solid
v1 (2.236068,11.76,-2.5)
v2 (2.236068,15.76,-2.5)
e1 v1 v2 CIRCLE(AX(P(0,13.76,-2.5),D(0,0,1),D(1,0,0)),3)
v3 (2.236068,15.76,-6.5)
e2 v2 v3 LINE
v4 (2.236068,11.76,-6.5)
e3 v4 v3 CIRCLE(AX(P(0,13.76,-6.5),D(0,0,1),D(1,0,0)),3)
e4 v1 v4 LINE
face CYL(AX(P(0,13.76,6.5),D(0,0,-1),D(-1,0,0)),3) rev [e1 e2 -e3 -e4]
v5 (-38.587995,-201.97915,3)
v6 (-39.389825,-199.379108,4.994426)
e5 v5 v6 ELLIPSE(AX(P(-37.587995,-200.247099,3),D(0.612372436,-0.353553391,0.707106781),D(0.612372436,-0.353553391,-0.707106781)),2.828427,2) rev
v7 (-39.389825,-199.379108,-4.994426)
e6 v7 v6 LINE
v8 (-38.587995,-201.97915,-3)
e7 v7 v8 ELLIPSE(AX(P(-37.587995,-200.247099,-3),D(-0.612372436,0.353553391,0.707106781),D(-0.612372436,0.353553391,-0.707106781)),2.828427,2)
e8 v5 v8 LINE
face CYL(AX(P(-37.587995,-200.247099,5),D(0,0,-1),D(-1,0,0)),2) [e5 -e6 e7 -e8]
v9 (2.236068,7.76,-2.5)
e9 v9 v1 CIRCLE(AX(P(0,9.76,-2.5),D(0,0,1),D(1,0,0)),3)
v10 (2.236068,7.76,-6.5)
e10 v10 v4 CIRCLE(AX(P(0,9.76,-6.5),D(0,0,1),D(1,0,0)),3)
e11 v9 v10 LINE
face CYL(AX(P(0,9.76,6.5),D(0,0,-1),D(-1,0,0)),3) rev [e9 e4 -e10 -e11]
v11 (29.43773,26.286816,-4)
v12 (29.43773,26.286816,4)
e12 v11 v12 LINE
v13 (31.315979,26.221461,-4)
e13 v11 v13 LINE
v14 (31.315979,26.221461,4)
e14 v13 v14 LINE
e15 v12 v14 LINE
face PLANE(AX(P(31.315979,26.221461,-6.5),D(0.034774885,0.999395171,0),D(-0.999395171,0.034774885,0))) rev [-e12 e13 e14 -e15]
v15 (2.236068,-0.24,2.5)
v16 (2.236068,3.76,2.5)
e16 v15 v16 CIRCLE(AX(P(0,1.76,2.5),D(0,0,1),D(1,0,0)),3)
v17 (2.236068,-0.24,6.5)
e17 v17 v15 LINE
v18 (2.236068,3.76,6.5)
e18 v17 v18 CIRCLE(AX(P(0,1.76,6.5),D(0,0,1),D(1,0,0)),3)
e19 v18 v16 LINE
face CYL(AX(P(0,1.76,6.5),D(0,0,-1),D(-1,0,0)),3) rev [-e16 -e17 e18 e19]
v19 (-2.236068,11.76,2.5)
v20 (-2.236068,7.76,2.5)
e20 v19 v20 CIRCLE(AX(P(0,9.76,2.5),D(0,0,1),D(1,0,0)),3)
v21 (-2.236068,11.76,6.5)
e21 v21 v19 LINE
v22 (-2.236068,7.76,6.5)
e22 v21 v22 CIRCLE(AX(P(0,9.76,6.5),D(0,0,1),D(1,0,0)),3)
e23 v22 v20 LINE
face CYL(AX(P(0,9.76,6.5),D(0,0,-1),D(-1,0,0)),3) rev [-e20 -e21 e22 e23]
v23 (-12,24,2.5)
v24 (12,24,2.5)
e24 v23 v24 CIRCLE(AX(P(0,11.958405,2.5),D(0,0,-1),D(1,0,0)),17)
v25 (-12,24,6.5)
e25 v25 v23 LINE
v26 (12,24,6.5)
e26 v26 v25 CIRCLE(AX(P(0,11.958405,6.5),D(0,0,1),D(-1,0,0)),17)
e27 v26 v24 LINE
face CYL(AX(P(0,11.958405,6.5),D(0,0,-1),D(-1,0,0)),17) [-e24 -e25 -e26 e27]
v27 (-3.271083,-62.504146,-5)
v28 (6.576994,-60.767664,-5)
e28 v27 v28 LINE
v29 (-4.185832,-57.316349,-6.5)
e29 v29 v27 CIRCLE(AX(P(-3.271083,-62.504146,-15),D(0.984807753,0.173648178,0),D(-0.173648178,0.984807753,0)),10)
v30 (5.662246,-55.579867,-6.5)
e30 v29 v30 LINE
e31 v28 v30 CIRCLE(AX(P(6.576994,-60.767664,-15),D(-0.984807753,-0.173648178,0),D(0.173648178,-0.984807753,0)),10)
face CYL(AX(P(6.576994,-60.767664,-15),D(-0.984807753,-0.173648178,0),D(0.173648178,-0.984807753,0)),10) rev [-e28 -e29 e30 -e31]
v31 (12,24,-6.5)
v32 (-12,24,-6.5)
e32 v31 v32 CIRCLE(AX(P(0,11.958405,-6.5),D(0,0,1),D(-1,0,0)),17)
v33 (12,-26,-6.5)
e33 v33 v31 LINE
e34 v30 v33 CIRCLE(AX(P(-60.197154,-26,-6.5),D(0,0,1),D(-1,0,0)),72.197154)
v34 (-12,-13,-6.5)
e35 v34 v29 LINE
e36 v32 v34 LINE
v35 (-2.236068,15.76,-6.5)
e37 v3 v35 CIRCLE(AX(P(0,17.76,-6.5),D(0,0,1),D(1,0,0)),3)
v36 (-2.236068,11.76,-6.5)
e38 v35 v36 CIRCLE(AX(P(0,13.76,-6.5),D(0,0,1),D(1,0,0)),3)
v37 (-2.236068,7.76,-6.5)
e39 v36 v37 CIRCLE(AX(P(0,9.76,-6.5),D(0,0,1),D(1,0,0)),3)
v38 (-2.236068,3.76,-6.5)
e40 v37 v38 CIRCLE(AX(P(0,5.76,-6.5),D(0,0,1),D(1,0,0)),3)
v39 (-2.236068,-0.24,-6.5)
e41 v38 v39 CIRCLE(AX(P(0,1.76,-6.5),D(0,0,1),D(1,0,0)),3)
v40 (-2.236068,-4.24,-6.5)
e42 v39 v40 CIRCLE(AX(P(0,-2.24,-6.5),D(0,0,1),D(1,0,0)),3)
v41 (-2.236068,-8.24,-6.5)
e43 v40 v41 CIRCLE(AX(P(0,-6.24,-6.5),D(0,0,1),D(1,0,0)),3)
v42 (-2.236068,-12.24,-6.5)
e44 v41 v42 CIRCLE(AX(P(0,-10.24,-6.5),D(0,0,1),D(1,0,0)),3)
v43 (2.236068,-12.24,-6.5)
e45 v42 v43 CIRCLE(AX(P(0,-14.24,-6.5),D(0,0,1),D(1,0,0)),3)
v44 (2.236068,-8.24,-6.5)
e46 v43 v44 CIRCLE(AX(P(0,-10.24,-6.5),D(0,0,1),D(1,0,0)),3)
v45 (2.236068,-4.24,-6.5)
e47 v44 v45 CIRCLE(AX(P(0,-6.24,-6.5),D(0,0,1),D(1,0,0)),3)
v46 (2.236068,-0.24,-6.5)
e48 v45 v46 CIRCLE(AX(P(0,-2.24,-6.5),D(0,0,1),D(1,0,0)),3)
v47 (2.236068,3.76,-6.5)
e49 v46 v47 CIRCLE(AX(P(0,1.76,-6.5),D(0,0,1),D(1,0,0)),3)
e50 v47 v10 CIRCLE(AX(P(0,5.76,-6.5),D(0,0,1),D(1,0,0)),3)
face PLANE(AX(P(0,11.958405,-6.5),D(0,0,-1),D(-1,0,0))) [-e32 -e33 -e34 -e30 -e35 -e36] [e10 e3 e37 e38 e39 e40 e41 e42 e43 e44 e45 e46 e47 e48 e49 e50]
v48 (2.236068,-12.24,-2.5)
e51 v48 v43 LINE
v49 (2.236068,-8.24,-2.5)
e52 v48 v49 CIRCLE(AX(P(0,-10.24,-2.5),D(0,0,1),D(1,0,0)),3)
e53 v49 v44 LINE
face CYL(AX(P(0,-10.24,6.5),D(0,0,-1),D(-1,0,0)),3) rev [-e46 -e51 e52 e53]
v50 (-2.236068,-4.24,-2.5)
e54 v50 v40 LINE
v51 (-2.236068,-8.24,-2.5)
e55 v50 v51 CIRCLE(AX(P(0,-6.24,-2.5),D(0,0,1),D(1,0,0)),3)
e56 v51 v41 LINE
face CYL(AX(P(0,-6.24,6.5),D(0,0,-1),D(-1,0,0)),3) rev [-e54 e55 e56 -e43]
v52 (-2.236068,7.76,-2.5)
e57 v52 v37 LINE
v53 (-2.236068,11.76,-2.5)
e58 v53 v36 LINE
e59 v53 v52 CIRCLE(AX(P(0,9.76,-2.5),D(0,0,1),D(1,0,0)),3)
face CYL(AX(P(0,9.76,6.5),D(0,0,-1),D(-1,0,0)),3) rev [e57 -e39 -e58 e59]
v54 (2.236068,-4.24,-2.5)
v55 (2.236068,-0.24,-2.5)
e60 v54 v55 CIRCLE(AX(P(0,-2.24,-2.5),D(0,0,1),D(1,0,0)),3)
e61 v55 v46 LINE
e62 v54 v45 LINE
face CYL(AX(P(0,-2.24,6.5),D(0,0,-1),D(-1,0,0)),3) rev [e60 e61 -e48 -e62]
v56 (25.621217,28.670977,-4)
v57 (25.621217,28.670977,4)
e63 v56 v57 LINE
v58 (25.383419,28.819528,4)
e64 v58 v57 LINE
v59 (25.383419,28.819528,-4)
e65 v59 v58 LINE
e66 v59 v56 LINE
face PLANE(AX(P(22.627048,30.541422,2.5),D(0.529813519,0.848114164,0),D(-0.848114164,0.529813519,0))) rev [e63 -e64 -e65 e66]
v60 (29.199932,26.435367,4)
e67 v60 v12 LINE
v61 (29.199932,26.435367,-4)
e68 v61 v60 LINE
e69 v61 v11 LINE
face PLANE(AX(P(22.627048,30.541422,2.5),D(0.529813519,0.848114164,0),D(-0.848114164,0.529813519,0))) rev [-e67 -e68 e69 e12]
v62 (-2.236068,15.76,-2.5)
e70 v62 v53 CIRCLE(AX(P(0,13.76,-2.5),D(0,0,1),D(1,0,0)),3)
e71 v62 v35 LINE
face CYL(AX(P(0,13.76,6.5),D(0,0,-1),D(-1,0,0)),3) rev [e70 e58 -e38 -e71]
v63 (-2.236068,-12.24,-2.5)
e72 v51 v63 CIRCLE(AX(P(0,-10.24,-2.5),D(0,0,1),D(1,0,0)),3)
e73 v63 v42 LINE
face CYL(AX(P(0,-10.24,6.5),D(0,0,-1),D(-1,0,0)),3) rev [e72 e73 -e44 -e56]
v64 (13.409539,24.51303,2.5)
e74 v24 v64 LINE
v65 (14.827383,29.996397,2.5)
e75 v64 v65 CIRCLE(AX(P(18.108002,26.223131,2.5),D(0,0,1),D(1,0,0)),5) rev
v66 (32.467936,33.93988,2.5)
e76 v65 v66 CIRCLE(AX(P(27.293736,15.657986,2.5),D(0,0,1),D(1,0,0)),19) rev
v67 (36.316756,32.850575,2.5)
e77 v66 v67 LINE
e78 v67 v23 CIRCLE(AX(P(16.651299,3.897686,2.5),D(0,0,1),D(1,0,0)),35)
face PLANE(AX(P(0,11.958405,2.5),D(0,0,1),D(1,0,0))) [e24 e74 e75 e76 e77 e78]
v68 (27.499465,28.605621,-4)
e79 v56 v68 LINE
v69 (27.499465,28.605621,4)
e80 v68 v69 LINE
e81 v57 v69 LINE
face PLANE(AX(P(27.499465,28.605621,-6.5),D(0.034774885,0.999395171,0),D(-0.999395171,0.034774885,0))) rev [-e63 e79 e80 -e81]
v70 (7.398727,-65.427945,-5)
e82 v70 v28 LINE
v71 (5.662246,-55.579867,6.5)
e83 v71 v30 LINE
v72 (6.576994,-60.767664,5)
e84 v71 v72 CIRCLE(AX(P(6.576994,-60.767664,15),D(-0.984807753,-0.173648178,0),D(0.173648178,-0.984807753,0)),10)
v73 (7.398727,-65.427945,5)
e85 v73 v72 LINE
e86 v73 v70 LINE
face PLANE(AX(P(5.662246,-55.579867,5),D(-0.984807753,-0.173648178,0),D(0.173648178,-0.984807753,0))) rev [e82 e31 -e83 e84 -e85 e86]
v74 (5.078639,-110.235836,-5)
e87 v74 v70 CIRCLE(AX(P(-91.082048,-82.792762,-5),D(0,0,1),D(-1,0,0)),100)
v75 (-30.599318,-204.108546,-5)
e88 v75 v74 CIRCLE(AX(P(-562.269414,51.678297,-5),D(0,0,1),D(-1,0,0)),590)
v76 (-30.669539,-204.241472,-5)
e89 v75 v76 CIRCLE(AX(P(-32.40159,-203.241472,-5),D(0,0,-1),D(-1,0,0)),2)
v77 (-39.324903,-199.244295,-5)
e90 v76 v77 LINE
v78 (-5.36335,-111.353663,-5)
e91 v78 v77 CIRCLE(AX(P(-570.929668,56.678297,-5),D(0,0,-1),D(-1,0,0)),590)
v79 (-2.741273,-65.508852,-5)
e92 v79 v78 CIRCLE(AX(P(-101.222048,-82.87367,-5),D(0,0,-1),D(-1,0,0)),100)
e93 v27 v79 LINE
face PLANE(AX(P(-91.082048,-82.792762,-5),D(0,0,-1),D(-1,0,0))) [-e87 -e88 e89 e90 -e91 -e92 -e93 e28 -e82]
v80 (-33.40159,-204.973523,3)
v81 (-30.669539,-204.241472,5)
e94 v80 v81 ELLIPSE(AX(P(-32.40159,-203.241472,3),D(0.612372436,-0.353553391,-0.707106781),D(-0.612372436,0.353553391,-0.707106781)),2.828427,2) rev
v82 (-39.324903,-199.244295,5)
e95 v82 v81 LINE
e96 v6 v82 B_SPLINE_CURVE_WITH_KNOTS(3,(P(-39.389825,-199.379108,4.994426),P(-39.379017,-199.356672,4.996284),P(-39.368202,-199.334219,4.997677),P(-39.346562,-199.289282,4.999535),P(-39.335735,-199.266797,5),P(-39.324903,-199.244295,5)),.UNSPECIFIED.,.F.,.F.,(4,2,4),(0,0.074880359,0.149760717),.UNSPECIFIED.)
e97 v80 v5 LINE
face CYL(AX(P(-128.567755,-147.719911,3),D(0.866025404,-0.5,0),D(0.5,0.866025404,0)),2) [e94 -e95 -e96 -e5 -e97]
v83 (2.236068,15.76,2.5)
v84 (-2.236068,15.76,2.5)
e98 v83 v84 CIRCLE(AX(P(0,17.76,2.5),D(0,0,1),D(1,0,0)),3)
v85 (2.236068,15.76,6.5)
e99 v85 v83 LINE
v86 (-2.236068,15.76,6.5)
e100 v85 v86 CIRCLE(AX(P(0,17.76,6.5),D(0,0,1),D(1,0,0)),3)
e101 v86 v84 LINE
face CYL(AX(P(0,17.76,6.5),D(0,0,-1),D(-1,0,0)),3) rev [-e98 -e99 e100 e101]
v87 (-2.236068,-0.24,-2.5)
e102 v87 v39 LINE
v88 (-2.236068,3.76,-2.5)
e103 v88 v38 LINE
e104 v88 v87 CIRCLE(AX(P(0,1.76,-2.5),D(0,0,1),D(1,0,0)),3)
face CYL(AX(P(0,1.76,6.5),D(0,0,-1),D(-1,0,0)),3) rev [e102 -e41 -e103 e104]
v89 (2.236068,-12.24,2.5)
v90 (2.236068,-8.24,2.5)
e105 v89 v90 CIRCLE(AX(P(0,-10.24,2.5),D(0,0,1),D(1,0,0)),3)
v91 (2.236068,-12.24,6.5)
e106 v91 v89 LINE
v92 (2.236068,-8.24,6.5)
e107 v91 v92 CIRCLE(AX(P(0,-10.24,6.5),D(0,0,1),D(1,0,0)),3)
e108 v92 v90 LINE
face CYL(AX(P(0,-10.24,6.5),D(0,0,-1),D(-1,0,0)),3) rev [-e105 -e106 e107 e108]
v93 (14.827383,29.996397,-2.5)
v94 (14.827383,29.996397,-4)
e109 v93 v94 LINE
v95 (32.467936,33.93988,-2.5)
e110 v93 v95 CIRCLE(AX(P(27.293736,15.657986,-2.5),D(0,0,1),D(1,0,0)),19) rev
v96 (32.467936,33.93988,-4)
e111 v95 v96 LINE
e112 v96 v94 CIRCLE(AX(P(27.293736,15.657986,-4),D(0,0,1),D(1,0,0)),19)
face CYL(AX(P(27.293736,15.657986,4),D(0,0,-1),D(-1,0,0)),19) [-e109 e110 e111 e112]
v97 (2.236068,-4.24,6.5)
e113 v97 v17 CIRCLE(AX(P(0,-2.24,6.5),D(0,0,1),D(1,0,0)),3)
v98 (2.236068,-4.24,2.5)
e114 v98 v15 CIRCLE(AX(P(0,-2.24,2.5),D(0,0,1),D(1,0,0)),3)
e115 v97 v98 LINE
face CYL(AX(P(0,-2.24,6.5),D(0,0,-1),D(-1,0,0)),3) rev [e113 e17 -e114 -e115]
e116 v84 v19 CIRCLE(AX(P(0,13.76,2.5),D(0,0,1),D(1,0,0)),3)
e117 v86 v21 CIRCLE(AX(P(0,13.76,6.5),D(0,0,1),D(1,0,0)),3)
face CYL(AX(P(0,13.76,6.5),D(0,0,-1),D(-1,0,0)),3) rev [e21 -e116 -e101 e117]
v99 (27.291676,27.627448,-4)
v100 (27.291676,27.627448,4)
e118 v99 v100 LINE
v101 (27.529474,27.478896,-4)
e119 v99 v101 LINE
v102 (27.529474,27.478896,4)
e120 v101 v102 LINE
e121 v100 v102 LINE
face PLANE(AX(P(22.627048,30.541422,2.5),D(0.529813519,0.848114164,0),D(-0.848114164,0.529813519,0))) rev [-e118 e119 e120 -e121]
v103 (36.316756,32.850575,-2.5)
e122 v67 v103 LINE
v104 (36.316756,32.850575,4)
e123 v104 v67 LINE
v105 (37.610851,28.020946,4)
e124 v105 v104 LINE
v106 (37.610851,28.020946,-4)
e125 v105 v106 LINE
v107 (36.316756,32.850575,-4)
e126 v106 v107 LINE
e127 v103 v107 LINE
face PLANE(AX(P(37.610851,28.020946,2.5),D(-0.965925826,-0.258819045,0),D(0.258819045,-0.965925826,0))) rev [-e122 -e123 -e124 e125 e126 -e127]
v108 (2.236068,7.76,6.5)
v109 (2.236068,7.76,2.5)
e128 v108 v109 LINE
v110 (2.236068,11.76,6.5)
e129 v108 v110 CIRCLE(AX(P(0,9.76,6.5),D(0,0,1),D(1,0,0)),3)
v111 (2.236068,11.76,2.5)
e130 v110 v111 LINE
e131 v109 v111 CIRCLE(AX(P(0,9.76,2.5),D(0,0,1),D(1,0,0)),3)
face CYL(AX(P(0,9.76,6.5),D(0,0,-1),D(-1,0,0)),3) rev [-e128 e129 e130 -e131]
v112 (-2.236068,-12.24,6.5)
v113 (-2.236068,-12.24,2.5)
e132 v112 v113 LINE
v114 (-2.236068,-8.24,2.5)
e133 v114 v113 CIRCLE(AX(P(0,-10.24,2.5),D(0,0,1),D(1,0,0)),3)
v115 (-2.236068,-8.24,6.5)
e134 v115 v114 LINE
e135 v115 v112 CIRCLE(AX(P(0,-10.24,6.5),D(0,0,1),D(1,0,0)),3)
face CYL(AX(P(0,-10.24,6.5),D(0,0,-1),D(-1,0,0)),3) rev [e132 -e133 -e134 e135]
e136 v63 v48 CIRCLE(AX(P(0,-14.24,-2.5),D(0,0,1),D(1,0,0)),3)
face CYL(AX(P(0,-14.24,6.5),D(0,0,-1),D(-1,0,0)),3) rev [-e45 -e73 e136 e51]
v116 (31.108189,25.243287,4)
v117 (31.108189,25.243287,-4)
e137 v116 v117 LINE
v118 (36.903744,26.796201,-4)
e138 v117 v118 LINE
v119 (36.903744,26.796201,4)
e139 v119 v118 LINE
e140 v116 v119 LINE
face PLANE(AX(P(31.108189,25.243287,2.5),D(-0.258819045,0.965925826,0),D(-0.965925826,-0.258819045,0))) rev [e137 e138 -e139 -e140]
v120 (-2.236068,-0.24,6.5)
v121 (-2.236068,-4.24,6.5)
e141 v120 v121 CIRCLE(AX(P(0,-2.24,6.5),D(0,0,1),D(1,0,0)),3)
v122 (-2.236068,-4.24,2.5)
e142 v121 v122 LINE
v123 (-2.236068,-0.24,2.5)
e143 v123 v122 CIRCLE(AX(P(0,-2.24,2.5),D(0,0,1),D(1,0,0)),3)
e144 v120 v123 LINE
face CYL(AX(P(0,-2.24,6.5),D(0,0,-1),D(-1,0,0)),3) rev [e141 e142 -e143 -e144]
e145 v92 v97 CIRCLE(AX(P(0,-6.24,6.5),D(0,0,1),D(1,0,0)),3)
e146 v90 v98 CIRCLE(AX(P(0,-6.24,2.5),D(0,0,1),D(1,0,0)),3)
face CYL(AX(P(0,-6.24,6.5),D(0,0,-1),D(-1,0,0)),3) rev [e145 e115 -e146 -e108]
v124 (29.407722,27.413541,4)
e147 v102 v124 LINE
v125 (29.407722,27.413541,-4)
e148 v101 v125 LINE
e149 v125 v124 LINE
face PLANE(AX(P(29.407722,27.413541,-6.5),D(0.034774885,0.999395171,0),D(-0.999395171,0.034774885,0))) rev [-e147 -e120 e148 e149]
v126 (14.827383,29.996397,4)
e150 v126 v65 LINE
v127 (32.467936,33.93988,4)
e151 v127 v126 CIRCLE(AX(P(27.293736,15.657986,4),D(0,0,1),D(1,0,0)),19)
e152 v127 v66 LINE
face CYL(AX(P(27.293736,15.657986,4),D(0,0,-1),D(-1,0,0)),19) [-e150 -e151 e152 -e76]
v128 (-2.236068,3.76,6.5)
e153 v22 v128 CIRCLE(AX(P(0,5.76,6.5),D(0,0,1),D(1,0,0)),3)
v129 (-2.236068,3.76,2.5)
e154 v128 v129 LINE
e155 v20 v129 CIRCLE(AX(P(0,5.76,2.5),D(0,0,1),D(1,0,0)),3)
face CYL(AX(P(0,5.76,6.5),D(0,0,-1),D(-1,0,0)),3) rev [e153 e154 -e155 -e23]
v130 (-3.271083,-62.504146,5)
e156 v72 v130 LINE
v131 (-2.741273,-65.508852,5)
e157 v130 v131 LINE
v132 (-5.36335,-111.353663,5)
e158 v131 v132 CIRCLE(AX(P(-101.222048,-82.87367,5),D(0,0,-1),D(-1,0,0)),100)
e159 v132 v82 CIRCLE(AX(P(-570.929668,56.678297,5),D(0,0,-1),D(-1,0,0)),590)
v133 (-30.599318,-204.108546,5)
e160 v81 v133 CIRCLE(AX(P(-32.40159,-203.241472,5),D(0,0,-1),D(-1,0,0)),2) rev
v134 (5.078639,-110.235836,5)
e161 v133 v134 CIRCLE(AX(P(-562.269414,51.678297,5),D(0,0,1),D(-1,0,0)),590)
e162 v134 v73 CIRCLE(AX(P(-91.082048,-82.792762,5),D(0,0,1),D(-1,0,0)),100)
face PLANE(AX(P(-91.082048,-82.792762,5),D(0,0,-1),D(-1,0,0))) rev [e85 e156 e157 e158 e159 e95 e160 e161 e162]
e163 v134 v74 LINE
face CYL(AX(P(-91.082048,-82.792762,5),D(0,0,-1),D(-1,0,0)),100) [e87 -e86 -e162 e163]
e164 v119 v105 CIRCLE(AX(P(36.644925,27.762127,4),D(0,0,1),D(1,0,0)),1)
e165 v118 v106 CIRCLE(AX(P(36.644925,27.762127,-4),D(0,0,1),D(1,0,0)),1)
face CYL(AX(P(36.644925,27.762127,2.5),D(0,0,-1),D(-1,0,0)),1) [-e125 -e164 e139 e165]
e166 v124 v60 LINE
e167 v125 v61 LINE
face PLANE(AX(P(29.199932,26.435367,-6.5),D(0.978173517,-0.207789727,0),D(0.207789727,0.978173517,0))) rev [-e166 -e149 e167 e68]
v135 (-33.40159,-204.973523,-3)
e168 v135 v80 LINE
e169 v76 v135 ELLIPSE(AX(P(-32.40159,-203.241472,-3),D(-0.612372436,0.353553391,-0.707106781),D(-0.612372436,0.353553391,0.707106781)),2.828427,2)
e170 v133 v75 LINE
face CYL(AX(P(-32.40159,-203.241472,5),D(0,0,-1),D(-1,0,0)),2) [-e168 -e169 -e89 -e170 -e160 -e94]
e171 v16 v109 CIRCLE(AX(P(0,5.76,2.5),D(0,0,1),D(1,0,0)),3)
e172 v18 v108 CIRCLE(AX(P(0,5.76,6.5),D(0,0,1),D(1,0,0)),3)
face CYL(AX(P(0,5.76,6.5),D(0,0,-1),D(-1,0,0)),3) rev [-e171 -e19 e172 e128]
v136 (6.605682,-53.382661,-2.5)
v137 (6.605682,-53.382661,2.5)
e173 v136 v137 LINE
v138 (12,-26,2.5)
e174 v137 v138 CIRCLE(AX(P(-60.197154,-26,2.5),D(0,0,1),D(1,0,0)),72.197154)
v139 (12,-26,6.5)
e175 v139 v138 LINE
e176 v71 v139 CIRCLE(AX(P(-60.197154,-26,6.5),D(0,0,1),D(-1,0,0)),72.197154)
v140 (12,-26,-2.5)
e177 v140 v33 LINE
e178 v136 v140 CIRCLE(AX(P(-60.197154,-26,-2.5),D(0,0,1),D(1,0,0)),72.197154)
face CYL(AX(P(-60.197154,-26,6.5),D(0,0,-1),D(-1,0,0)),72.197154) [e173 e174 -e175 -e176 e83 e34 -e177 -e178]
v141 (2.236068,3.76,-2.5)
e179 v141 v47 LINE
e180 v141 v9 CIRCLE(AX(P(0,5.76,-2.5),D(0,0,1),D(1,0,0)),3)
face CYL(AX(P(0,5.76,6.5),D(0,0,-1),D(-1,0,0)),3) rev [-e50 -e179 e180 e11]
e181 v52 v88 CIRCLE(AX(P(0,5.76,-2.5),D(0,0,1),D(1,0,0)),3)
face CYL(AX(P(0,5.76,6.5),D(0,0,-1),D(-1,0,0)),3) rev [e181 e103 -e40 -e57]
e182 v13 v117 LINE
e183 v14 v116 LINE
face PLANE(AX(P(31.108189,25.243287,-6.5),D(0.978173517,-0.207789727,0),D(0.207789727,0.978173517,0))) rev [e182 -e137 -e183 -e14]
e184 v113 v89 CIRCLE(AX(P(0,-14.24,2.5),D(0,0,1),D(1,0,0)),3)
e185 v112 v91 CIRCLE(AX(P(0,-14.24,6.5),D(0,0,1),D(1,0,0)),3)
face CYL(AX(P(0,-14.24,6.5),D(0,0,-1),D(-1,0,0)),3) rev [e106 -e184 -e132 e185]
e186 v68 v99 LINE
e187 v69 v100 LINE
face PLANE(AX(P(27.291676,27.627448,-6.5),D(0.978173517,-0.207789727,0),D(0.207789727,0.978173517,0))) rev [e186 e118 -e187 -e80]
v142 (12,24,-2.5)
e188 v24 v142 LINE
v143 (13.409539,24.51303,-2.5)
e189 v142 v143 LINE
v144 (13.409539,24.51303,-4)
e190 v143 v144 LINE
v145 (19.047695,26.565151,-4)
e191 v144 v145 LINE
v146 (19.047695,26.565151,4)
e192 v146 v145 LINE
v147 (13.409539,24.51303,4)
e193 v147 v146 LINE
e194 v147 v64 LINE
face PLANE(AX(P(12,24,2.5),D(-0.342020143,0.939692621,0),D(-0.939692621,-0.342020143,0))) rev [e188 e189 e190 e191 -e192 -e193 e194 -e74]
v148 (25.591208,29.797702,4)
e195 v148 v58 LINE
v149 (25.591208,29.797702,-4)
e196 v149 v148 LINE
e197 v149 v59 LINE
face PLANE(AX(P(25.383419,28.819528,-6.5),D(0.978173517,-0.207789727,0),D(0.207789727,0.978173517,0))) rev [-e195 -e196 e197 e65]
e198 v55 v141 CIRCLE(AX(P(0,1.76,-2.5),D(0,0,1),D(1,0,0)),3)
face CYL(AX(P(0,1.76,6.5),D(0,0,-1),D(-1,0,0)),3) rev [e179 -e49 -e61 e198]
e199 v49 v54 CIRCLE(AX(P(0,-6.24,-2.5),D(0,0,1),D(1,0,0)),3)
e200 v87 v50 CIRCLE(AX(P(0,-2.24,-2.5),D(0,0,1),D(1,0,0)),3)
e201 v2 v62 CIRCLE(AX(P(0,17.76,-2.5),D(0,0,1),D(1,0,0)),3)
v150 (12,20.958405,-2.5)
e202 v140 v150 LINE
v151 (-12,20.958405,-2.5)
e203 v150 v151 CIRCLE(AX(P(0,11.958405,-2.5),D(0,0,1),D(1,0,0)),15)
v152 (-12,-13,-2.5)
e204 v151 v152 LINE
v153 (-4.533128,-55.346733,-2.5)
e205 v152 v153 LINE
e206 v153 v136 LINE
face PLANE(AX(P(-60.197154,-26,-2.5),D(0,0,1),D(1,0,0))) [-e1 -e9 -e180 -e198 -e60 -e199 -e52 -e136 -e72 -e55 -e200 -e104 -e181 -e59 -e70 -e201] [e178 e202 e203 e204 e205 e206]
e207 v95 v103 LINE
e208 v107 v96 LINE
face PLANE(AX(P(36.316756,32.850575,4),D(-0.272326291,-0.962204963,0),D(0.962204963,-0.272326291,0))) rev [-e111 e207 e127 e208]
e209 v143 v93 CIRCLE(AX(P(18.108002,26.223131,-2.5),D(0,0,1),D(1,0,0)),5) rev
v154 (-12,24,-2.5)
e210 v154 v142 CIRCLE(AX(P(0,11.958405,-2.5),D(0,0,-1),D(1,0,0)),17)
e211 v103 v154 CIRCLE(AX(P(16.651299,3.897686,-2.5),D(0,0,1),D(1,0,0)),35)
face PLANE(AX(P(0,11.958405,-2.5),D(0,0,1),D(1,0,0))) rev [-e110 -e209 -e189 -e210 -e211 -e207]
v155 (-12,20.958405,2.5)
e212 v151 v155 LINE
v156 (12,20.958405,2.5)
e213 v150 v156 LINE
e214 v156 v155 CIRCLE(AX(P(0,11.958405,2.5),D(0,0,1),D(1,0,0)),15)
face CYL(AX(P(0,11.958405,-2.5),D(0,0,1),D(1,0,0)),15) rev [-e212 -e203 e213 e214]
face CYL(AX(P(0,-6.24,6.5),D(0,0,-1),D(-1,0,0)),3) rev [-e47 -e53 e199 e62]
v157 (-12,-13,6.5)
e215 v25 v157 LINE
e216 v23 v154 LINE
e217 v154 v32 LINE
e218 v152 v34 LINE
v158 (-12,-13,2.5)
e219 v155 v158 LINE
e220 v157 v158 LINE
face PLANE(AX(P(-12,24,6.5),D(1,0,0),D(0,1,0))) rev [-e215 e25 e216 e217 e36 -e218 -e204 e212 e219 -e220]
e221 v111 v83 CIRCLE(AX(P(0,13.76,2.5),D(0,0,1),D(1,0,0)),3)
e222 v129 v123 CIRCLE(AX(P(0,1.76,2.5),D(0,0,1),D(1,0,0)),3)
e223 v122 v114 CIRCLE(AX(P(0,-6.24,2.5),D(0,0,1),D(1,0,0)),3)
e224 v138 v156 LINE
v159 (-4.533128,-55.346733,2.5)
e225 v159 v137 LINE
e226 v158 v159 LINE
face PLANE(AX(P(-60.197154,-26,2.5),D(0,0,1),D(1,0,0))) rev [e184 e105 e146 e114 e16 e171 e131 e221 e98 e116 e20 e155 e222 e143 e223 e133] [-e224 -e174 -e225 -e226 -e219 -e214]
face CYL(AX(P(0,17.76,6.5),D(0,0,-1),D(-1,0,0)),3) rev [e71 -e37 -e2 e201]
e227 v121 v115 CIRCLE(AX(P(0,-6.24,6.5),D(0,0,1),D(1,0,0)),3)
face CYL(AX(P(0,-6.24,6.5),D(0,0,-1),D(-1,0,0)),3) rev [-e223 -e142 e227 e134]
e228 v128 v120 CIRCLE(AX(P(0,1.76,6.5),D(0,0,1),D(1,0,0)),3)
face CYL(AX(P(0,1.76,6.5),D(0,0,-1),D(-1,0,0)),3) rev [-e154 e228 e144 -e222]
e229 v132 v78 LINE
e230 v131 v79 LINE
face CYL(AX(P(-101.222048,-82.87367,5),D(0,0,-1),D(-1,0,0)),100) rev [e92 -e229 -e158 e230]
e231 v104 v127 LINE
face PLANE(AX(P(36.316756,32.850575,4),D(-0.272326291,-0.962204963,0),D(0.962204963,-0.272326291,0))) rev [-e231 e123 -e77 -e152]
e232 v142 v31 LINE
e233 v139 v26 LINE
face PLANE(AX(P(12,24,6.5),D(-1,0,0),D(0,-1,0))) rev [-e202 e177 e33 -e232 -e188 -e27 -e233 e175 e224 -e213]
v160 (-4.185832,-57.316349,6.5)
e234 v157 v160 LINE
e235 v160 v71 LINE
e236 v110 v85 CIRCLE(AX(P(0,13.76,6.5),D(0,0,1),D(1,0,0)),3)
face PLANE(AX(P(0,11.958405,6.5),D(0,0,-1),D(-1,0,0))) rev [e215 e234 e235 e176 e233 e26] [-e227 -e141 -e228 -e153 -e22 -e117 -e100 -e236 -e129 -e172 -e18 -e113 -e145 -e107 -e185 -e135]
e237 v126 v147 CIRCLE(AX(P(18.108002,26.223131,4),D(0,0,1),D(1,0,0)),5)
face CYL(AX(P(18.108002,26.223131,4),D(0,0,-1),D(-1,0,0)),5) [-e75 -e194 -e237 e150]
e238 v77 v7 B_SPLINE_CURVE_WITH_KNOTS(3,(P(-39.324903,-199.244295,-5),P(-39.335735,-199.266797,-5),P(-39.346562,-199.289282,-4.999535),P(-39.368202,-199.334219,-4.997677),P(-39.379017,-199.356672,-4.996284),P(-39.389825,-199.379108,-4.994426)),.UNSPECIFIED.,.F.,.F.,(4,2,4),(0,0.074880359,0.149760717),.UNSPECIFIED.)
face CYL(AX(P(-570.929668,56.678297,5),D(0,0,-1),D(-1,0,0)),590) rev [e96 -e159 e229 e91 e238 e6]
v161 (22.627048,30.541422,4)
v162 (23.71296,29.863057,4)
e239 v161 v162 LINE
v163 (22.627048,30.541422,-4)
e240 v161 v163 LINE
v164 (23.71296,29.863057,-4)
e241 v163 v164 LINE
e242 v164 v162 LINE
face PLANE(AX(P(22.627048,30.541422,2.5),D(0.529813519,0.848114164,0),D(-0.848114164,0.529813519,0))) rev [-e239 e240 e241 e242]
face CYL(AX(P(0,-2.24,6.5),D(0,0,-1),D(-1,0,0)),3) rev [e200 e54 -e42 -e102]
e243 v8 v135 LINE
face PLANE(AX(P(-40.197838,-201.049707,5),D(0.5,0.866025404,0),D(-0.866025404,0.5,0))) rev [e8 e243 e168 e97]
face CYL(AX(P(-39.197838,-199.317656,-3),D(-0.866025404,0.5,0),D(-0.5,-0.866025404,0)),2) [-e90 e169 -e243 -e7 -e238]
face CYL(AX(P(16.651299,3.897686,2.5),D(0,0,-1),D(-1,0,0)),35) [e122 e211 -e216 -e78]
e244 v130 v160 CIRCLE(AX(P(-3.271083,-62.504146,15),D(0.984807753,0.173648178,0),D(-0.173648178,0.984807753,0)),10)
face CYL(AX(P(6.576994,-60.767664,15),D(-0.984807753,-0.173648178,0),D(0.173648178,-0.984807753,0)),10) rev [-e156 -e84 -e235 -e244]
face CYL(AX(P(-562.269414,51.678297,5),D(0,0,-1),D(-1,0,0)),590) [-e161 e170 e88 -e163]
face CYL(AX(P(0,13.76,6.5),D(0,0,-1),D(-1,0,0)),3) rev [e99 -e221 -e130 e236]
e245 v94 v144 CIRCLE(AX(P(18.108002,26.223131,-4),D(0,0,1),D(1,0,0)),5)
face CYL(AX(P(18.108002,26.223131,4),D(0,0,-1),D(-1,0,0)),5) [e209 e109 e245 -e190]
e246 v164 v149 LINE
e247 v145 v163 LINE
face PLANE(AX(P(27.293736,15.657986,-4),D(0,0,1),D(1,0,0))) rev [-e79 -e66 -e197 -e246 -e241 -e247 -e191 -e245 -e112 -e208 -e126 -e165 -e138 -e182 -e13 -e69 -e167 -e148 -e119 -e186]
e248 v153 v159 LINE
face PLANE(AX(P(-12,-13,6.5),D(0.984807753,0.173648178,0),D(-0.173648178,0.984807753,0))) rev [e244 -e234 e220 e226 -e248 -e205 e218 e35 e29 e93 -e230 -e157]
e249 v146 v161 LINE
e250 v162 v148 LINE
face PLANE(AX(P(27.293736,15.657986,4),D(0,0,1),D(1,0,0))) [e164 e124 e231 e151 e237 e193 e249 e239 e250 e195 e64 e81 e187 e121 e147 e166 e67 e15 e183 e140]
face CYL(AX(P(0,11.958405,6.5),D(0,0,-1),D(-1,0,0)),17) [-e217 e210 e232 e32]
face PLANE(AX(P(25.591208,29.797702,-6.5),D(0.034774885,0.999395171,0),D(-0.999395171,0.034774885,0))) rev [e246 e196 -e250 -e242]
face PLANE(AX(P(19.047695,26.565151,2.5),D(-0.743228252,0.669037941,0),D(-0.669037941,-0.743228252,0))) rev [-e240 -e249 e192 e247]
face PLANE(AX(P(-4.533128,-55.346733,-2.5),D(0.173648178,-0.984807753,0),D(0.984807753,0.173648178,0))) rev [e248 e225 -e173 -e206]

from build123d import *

# Parameters (mm, degrees)
BOSS_EXTRUDE1_DEPTH = 6.5
BOSS_EXTRUDE2_DEPTH = 5
BOSS_EXTRUDE3_DEPTH = 2.5
CUT_EXTRUDE1_DEPTH  = 211.126980415
LPATTERN1_COUNT     = 4
LPATTERN1_PITCH     = 2.25
BOSS_EXTRUDE4_DEPTH = 4
FILLET1_R           = 10
FILLET2_R           = 2
CUT_EXTRUDE4_DEPTH  = 2.5


with BuildPart() as part:
    # Sketch1 → Boss-Extrude1 (new, symmetric)
    with BuildSketch(Plane.XY):
        with BuildLine():
            Line((12, 24), (12, -26))
            ThreePointArc((12, -26), (10.397782984, -41.125604698), (5.662245525, -55.579867109))
            Line((5.662245525, -55.579867109), (-4.185832005, -57.316348886))
            Line((-4.185832005, -57.316348886), (-12, -13))
            Line((-12, -13), (-12, 24))
            ThreePointArc((-12, 24), (0, 28.958405421), (12, 24))
        make_face()
        with BuildLine():
            ThreePointArc((2.236067977, 15.76), (0, 20.76), (-2.236067977, 15.76))
            ThreePointArc((-2.236067977, 15.76), (-3, 13.76), (-2.236067977, 11.76))
            ThreePointArc((-2.236067977, 11.76), (-3, 9.76), (-2.236067977, 7.76))
            ThreePointArc((-2.236067977, 7.76), (-3, 5.76), (-2.236067977, 3.76))
            ThreePointArc((-2.236067977, 3.76), (-3, 1.76), (-2.236067977, -0.24))
            ThreePointArc((-2.236067977, -0.24), (-3, -2.24), (-2.236067977, -4.24))
            ThreePointArc((-2.236067977, -4.24), (-3, -6.24), (-2.236067977, -8.24))
            ThreePointArc((-2.236067977, -8.24), (-3, -10.24), (-2.236067977, -12.24))
            ThreePointArc((-2.236067977, -12.24), (0, -17.24), (2.236067978, -12.24))
            ThreePointArc((2.236067978, -12.24), (3, -10.24), (2.236067978, -8.24))
            ThreePointArc((2.236067978, -8.24), (3, -6.24), (2.236067978, -4.24))
            ThreePointArc((2.236067978, -4.24), (3, -2.24), (2.236067977, -0.24))
            ThreePointArc((2.236067977, -0.24), (3, 1.76), (2.236067977, 3.76))
            ThreePointArc((2.236067977, 3.76), (3, 5.76), (2.236067977, 7.76))
            ThreePointArc((2.236067977, 7.76), (3, 9.76), (2.236067977, 11.76))
            ThreePointArc((2.236067977, 11.76), (3, 13.76), (2.236067977, 15.76))
        make_face(mode=Mode.SUBTRACT)
    extrude(amount=BOSS_EXTRUDE1_DEPTH, both=True)

    # Sketch2 → Boss-Extrude2 (add, symmetric)
    with BuildSketch(Plane.XY):
        with BuildLine():
            Line((-4.185832005, -57.316348886), (-2.741272698, -65.50885182))
            ThreePointArc((-2.741272698, -65.50885182), (-1.385209123, -88.583801204), (-5.363349951, -111.353662711))
            ThreePointArc((-5.363349951, -111.353662711), (-20.948984173, -156.913011465), (-40.197837741, -201.049706962))
            Line((-40.197837741, -201.049706962), (-31.537583703, -206.049706962))
            ThreePointArc((-31.537583703, -206.049706962), (-11.143355809, -158.940001486), (5.078639021, -110.235835698))
            ThreePointArc((5.078639021, -110.235835698), (8.784169957, -87.963691821), (7.398727302, -65.427944639))
            Line((7.398727302, -65.427944639), (5.662245525, -55.579867109))
            Line((5.662245525, -55.579867109), (-4.185832005, -57.316348886))
        make_face()
    extrude(amount=BOSS_EXTRUDE2_DEPTH, both=True)

    # Sketch3 → Boss-Extrude3 (add, symmetric)
    with BuildSketch(Plane.XY):
        with BuildLine():
            Line((12, 24), (19.047694656, 26.565151075))
            Line((19.047694656, 26.565151075), (22.627047638, 30.541422221))
            Line((22.627047638, 30.541422221), (31.108189275, 25.243287027))
            Line((31.108189275, 25.243287027), (36.903744232, 26.796201298))
            ThreePointArc((36.903744232, 26.796201298), (37.510950591, 27.262127124), (37.610851014, 28.020946169))
            Line((37.610851014, 28.020946169), (36.316755788, 32.850575301))
            ThreePointArc((36.316755788, 32.850575301), (10.344991875, 38.324862138), (-12, 24))
            ThreePointArc((-12, 24), (0, 28.958405421), (12, 24))
        make_face()
    extrude(amount=BOSS_EXTRUDE3_DEPTH, both=True)

    # Sketch4 → Cut-Extrude1 (cut, through all)
    with BuildSketch(Plane.XY.offset(2.5)):
        Polygon((31.108189275, 25.243287027), (31.315979001, 26.221460544), (29.437730467, 26.28681595), align=None)
    cut_extrude1 = extrude(amount=-CUT_EXTRUDE1_DEPTH, mode=Mode.SUBTRACT)

    # LPattern1: Cut-Extrude1 ×4
    with Locations(*[Vector(-0.8481141636867628, 0.5298135194140507, 0) * (i * LPATTERN1_PITCH) for i in range(1, LPATTERN1_COUNT)]):
        add(cut_extrude1, mode=Mode.SUBTRACT)

    # Sketch5 → Boss-Extrude4 (add, symmetric)
    with BuildSketch(Plane.XY):
        with BuildLine():
            Line((13.409538931, 24.513030215), (19.047694656, 26.565151075))
            Line((19.047694656, 26.565151075), (22.627047638, 30.541422221))
            Line((22.627047638, 30.541422221), (23.712959862, 29.863057207))
            Line((23.712959862, 29.863057207), (25.591208397, 29.7977018))
            Line((25.591208397, 29.7977018), (25.38341867, 28.819528283))
            Line((25.38341867, 28.819528283), (25.62121673, 28.670976788))
            Line((25.62121673, 28.670976788), (27.499465265, 28.605621382))
            Line((27.499465265, 28.605621382), (27.291675538, 27.627447865))
            Line((27.291675538, 27.627447865), (27.529473599, 27.478896369))
            Line((27.529473599, 27.478896369), (29.407722133, 27.413540963))
            Line((29.407722133, 27.413540963), (29.199932406, 26.435367446))
            Line((29.199932406, 26.435367446), (29.437730467, 26.28681595))
            Line((29.437730467, 26.28681595), (31.315979001, 26.221460544))
            Line((31.315979001, 26.221460544), (31.108189275, 25.243287027))
            Line((31.108189275, 25.243287027), (36.903744232, 26.796201298))
            ThreePointArc((36.903744232, 26.796201298), (37.510950591, 27.262127124), (37.610851014, 28.020946169))
            Line((37.610851014, 28.020946169), (36.316755788, 32.850575301))
            Line((36.316755788, 32.850575301), (32.467935935, 33.939880464))
            ThreePointArc((32.467935935, 33.939880464), (23.148661732, 34.20032571), (14.827382616, 29.996396921))
            ThreePointArc((14.827382616, 29.996396921), (13.267210046, 27.474822952), (13.409538931, 24.513030215))
        make_face()
    extrude(amount=BOSS_EXTRUDE4_DEPTH, both=True)

    # Fillet1
    # the kernel refuses this fillet: 10 mm, written as the material it adds along each edge
    with BuildSketch(Plane(origin=(5.662245525, -55.579867109, 5), x_dir=(0.17364817766693216, -0.9848077530122078, 0), z_dir=(-0.9848077530122078, -0.1736481776669322, 0))) as fillet1_piece_1_section:
        with BuildLine():
            CenterArc((5.267826876, 10), FILLET1_R, 238.211669383, 31.788330617)
            Line((0, 1.5), (-0.105356538, 1.33))
            ThreePointArc((-0.105356538, 1.33), (-0.2, 0.75), (-0.2, 0))
            Line((-0.2, 0), (0, -0.2))
            Line((0, -0.2), (5.267826876, -0.2))
            Line((5.267826876, -0.2), (5.267826876, 0))
        make_face()
    fillet1_piece_1 = extrude(amount=10, mode=Mode.PRIVATE)
    fillet1_piece_1 = fillet1_piece_1 - Plane(origin=(-60.197153865, -26, 5.108748651), x_dir=(1, 0, 0), z_dir=(0, 0, 1)) * Cylinder(72.197153865, 42, mode=Mode.PRIVATE)
    add(fillet1_piece_1)
    with BuildSketch(Plane(origin=(18.631737399, -53.292995765, 5), x_dir=(0.1736481776669322, -0.9848077530122078, 0), z_dir=(-0.9848077530122078, -0.1736481776669322, 0))) as fillet1_piece_2_section:
        with BuildLine():
            CenterArc((5.267826876, 10), FILLET1_R, 238.211669383, 31.788330617)
            Line((0, 1.5), (-0.105356538, 1.33))
            ThreePointArc((-0.105356538, 1.33), (-0.2, 0.75), (-0.2, 0))
            Line((-0.2, 0), (0, -0.2))
            Line((0, -0.2), (5.267826876, -0.2))
            Line((5.267826876, -0.2), (5.267826876, 0))
        make_face()
    fillet1_piece_2 = extrude(amount=23.169567191, mode=Mode.PRIVATE)
    fillet1_piece_2 = split(fillet1_piece_2, bisect_by=Plane(origin=(5.639763501, -55.452365217, 5.544024215), z_dir=(0.9848077530122079, 0.17364817766693152, 0)), keep=Keep.TOP, mode=Mode.PRIVATE)
    fillet1_piece_2 = fillet1_piece_2 & Plane(origin=(-60.197153865, -26, 5.544024215), x_dir=(1, 0, 0), z_dir=(0, 0, 1)) * Cylinder(72.197153865, 68, mode=Mode.PRIVATE)
    add(fillet1_piece_2)
    with BuildSketch(Plane(origin=(5.662245525, -55.579867109, 5), x_dir=(0.17364817766693216, -0.9848077530122078, 0), z_dir=(-0.9848077530122078, -0.1736481776669322, 0))) as fillet1_piece_3_section:
        with BuildLine():
            CenterArc((5.267826876, 10), FILLET1_R, 238.211669383, 31.788330617)
            Line((0, 1.5), (-0.105356538, 1.33))
            ThreePointArc((-0.105356538, 1.33), (-0.2, 0.75), (-0.2, 0))
            Line((-0.2, 0), (0, -0.2))
            Line((0, -0.2), (5.267826876, -0.2))
            Line((5.267826876, -0.2), (5.267826876, 0))
        make_face()
    fillet1_piece_3 = extrude(amount=10, mode=Mode.PRIVATE)
    fillet1_piece_3 = fillet1_piece_3 & Plane(origin=(-60.197153865, -26, 5.331257978), x_dir=(1, 0, 0), z_dir=(0, 0, 1)) * Cylinder(72.197153865, 42, mode=Mode.PRIVATE)
    add(fillet1_piece_3)
    with BuildSketch(Plane(origin=(5.662245525, -55.579867109, -5), x_dir=(0, 0, -1), z_dir=(-0.9848077530122078, -0.1736481776669322, 0))) as fillet1_piece_4_section:
        with BuildLine():
            CenterArc((10, 5.267826876), FILLET1_R, 180, 31.788330617)
            Line((0, 5.267826876), (-0.2, 5.267826876))
            Line((-0.2, 5.267826876), (-0.2, 0))
            Line((-0.2, 0), (0, -0.2))
            ThreePointArc((0, -0.2), (0.75, -0.2), (1.33, -0.105356538))
            Line((1.33, -0.105356538), (1.5, 0))
        make_face()
    fillet1_piece_4 = extrude(amount=10, mode=Mode.PRIVATE)
    fillet1_piece_4 = fillet1_piece_4 - Plane(origin=(-60.197153865, -26, -5.108748651), x_dir=(1, 0, 0), z_dir=(0, 0, 1)) * Cylinder(72.197153865, 42, mode=Mode.PRIVATE)
    add(fillet1_piece_4)
    with BuildSketch(Plane(origin=(5.662245525, -55.579867109, -5), x_dir=(0, 0, -1), z_dir=(-0.9848077530122078, -0.1736481776669322, 0))) as fillet1_piece_5_section:
        with BuildLine():
            CenterArc((10, 5.267826876), FILLET1_R, 180, 31.788330617)
            Line((0, 5.267826876), (-0.2, 5.267826876))
            Line((-0.2, 5.267826876), (-0.2, 0))
            Line((-0.2, 0), (0, -0.2))
            ThreePointArc((0, -0.2), (0.75, -0.2), (1.33, -0.105356538))
            Line((1.33, -0.105356538), (1.5, 0))
        make_face()
    fillet1_piece_5 = extrude(amount=10, mode=Mode.PRIVATE)
    fillet1_piece_5 = fillet1_piece_5 & Plane(origin=(-60.197153865, -26, -5.331257978), x_dir=(1, 0, 0), z_dir=(0, 0, 1)) * Cylinder(72.197153865, 42, mode=Mode.PRIVATE)
    add(fillet1_piece_5)
    with BuildSketch(Plane(origin=(18.631737399, -53.292995765, -5), x_dir=(0, 0, -1), z_dir=(-0.9848077530122078, -0.1736481776669322, 0))) as fillet1_piece_6_section:
        with BuildLine():
            CenterArc((10, 5.267826876), FILLET1_R, 180, 31.788330617)
            Line((0, 5.267826876), (-0.2, 5.267826876))
            Line((-0.2, 5.267826876), (-0.2, 0))
            Line((-0.2, 0), (0, -0.2))
            ThreePointArc((0, -0.2), (0.75, -0.2), (1.33, -0.105356538))
            Line((1.33, -0.105356538), (1.5, 0))
        make_face()
    fillet1_piece_6 = extrude(amount=23.169567191, mode=Mode.PRIVATE)
    fillet1_piece_6 = fillet1_piece_6 & Plane(origin=(-60.197153865, -26, -5.544024216), x_dir=(1, 0, 0), z_dir=(0, 0, 1)) * Cylinder(72.197153865, 68, mode=Mode.PRIVATE)
    fillet1_piece_6 = split(fillet1_piece_6, bisect_by=Plane(origin=(5.639763501, -55.452365217, -5.544024216), z_dir=(0.9848077530122079, 0.17364817766693152, 0)), keep=Keep.TOP, mode=Mode.PRIVATE)
    add(fillet1_piece_6)

    # Fillet2
    # the kernel refuses this fillet: 2 mm, written as the material it takes off along each edge
    with BuildSketch(Plane(origin=(-44.52796476, -198.549706962, -5), x_dir=(0.5000000000000003, 0.8660254037844385, 0), z_dir=(0.8660254037844386, -0.5000000000000003, 0)), Plane(origin=(-44.52796476, -198.549706962, 5), x_dir=(0, 0, -1), z_dir=(0.8660254037844386, -0.5000000000000003, 0))) as fillet2_piece_1:
        with BuildLine():
            CenterArc((FILLET2_R, FILLET2_R), FILLET2_R, 180, 90)
            Line((0, FILLET2_R), (0, 0))
            Line((0, 0), (FILLET2_R, 0))
        make_face()
    extrude(amount=20, mode=Mode.SUBTRACT)
    with BuildSketch(Plane(origin=(-40.197837741, -201.049706962, -9.647216237), x_dir=(0.8660254037844397, -0.4999999999999982, 0), z_dir=(0, 0, 1))) as fillet2_piece_2:
        with BuildLine():
            CenterArc((1.858886495, 2), FILLET2_R, 184.278600347, 85.721399653)
            ThreePointArc((-0.135539641, 1.850787443), (-0.067042153, 0.925447011), (0, 0))
            Line((0, 0), (1.858886495, 0))
        make_face()
    extrude(amount=19.294432475, mode=Mode.SUBTRACT)
    with BuildSketch(Plane(origin=(-31.537583703, -206.049706962, 10.39006535), x_dir=(-0.8660254037844383, 0.5000000000000006, 0), z_dir=(0, 0, -1))) as fillet2_piece_3:
        with BuildLine():
            CenterArc((2.152368756, 2), FILLET2_R, 175.692238748, 94.307761252)
            ThreePointArc((0.158018821, 2.150227608), (0.078027217, 1.075185985), (0, 0))
            Line((0, 0), (2.152368756, 0))
        make_face()
    extrude(amount=20.780130699, mode=Mode.SUBTRACT)

    # Sketch10 → Cut-Extrude4 (cut, symmetric)
    with BuildSketch(Plane.XY):
        with BuildLine():
            Line((-4.53312836, -55.34673338), (6.605682372, -53.382660514))
            ThreePointArc((6.605682372, -53.382660514), (10.638584547, -39.954468456), (12, -26))
            Line((12, -26), (12, 20.958405421))
            ThreePointArc((12, 20.958405421), (0, 26.958405421), (-12, 20.958405421))
            Line((-12, 20.958405421), (-12, -13))
            Line((-12, -13), (-4.53312836, -55.34673338))
        make_face()
    extrude(amount=CUT_EXTRUDE4_DEPTH, both=True, mode=Mode.SUBTRACT)


solid = part.part
